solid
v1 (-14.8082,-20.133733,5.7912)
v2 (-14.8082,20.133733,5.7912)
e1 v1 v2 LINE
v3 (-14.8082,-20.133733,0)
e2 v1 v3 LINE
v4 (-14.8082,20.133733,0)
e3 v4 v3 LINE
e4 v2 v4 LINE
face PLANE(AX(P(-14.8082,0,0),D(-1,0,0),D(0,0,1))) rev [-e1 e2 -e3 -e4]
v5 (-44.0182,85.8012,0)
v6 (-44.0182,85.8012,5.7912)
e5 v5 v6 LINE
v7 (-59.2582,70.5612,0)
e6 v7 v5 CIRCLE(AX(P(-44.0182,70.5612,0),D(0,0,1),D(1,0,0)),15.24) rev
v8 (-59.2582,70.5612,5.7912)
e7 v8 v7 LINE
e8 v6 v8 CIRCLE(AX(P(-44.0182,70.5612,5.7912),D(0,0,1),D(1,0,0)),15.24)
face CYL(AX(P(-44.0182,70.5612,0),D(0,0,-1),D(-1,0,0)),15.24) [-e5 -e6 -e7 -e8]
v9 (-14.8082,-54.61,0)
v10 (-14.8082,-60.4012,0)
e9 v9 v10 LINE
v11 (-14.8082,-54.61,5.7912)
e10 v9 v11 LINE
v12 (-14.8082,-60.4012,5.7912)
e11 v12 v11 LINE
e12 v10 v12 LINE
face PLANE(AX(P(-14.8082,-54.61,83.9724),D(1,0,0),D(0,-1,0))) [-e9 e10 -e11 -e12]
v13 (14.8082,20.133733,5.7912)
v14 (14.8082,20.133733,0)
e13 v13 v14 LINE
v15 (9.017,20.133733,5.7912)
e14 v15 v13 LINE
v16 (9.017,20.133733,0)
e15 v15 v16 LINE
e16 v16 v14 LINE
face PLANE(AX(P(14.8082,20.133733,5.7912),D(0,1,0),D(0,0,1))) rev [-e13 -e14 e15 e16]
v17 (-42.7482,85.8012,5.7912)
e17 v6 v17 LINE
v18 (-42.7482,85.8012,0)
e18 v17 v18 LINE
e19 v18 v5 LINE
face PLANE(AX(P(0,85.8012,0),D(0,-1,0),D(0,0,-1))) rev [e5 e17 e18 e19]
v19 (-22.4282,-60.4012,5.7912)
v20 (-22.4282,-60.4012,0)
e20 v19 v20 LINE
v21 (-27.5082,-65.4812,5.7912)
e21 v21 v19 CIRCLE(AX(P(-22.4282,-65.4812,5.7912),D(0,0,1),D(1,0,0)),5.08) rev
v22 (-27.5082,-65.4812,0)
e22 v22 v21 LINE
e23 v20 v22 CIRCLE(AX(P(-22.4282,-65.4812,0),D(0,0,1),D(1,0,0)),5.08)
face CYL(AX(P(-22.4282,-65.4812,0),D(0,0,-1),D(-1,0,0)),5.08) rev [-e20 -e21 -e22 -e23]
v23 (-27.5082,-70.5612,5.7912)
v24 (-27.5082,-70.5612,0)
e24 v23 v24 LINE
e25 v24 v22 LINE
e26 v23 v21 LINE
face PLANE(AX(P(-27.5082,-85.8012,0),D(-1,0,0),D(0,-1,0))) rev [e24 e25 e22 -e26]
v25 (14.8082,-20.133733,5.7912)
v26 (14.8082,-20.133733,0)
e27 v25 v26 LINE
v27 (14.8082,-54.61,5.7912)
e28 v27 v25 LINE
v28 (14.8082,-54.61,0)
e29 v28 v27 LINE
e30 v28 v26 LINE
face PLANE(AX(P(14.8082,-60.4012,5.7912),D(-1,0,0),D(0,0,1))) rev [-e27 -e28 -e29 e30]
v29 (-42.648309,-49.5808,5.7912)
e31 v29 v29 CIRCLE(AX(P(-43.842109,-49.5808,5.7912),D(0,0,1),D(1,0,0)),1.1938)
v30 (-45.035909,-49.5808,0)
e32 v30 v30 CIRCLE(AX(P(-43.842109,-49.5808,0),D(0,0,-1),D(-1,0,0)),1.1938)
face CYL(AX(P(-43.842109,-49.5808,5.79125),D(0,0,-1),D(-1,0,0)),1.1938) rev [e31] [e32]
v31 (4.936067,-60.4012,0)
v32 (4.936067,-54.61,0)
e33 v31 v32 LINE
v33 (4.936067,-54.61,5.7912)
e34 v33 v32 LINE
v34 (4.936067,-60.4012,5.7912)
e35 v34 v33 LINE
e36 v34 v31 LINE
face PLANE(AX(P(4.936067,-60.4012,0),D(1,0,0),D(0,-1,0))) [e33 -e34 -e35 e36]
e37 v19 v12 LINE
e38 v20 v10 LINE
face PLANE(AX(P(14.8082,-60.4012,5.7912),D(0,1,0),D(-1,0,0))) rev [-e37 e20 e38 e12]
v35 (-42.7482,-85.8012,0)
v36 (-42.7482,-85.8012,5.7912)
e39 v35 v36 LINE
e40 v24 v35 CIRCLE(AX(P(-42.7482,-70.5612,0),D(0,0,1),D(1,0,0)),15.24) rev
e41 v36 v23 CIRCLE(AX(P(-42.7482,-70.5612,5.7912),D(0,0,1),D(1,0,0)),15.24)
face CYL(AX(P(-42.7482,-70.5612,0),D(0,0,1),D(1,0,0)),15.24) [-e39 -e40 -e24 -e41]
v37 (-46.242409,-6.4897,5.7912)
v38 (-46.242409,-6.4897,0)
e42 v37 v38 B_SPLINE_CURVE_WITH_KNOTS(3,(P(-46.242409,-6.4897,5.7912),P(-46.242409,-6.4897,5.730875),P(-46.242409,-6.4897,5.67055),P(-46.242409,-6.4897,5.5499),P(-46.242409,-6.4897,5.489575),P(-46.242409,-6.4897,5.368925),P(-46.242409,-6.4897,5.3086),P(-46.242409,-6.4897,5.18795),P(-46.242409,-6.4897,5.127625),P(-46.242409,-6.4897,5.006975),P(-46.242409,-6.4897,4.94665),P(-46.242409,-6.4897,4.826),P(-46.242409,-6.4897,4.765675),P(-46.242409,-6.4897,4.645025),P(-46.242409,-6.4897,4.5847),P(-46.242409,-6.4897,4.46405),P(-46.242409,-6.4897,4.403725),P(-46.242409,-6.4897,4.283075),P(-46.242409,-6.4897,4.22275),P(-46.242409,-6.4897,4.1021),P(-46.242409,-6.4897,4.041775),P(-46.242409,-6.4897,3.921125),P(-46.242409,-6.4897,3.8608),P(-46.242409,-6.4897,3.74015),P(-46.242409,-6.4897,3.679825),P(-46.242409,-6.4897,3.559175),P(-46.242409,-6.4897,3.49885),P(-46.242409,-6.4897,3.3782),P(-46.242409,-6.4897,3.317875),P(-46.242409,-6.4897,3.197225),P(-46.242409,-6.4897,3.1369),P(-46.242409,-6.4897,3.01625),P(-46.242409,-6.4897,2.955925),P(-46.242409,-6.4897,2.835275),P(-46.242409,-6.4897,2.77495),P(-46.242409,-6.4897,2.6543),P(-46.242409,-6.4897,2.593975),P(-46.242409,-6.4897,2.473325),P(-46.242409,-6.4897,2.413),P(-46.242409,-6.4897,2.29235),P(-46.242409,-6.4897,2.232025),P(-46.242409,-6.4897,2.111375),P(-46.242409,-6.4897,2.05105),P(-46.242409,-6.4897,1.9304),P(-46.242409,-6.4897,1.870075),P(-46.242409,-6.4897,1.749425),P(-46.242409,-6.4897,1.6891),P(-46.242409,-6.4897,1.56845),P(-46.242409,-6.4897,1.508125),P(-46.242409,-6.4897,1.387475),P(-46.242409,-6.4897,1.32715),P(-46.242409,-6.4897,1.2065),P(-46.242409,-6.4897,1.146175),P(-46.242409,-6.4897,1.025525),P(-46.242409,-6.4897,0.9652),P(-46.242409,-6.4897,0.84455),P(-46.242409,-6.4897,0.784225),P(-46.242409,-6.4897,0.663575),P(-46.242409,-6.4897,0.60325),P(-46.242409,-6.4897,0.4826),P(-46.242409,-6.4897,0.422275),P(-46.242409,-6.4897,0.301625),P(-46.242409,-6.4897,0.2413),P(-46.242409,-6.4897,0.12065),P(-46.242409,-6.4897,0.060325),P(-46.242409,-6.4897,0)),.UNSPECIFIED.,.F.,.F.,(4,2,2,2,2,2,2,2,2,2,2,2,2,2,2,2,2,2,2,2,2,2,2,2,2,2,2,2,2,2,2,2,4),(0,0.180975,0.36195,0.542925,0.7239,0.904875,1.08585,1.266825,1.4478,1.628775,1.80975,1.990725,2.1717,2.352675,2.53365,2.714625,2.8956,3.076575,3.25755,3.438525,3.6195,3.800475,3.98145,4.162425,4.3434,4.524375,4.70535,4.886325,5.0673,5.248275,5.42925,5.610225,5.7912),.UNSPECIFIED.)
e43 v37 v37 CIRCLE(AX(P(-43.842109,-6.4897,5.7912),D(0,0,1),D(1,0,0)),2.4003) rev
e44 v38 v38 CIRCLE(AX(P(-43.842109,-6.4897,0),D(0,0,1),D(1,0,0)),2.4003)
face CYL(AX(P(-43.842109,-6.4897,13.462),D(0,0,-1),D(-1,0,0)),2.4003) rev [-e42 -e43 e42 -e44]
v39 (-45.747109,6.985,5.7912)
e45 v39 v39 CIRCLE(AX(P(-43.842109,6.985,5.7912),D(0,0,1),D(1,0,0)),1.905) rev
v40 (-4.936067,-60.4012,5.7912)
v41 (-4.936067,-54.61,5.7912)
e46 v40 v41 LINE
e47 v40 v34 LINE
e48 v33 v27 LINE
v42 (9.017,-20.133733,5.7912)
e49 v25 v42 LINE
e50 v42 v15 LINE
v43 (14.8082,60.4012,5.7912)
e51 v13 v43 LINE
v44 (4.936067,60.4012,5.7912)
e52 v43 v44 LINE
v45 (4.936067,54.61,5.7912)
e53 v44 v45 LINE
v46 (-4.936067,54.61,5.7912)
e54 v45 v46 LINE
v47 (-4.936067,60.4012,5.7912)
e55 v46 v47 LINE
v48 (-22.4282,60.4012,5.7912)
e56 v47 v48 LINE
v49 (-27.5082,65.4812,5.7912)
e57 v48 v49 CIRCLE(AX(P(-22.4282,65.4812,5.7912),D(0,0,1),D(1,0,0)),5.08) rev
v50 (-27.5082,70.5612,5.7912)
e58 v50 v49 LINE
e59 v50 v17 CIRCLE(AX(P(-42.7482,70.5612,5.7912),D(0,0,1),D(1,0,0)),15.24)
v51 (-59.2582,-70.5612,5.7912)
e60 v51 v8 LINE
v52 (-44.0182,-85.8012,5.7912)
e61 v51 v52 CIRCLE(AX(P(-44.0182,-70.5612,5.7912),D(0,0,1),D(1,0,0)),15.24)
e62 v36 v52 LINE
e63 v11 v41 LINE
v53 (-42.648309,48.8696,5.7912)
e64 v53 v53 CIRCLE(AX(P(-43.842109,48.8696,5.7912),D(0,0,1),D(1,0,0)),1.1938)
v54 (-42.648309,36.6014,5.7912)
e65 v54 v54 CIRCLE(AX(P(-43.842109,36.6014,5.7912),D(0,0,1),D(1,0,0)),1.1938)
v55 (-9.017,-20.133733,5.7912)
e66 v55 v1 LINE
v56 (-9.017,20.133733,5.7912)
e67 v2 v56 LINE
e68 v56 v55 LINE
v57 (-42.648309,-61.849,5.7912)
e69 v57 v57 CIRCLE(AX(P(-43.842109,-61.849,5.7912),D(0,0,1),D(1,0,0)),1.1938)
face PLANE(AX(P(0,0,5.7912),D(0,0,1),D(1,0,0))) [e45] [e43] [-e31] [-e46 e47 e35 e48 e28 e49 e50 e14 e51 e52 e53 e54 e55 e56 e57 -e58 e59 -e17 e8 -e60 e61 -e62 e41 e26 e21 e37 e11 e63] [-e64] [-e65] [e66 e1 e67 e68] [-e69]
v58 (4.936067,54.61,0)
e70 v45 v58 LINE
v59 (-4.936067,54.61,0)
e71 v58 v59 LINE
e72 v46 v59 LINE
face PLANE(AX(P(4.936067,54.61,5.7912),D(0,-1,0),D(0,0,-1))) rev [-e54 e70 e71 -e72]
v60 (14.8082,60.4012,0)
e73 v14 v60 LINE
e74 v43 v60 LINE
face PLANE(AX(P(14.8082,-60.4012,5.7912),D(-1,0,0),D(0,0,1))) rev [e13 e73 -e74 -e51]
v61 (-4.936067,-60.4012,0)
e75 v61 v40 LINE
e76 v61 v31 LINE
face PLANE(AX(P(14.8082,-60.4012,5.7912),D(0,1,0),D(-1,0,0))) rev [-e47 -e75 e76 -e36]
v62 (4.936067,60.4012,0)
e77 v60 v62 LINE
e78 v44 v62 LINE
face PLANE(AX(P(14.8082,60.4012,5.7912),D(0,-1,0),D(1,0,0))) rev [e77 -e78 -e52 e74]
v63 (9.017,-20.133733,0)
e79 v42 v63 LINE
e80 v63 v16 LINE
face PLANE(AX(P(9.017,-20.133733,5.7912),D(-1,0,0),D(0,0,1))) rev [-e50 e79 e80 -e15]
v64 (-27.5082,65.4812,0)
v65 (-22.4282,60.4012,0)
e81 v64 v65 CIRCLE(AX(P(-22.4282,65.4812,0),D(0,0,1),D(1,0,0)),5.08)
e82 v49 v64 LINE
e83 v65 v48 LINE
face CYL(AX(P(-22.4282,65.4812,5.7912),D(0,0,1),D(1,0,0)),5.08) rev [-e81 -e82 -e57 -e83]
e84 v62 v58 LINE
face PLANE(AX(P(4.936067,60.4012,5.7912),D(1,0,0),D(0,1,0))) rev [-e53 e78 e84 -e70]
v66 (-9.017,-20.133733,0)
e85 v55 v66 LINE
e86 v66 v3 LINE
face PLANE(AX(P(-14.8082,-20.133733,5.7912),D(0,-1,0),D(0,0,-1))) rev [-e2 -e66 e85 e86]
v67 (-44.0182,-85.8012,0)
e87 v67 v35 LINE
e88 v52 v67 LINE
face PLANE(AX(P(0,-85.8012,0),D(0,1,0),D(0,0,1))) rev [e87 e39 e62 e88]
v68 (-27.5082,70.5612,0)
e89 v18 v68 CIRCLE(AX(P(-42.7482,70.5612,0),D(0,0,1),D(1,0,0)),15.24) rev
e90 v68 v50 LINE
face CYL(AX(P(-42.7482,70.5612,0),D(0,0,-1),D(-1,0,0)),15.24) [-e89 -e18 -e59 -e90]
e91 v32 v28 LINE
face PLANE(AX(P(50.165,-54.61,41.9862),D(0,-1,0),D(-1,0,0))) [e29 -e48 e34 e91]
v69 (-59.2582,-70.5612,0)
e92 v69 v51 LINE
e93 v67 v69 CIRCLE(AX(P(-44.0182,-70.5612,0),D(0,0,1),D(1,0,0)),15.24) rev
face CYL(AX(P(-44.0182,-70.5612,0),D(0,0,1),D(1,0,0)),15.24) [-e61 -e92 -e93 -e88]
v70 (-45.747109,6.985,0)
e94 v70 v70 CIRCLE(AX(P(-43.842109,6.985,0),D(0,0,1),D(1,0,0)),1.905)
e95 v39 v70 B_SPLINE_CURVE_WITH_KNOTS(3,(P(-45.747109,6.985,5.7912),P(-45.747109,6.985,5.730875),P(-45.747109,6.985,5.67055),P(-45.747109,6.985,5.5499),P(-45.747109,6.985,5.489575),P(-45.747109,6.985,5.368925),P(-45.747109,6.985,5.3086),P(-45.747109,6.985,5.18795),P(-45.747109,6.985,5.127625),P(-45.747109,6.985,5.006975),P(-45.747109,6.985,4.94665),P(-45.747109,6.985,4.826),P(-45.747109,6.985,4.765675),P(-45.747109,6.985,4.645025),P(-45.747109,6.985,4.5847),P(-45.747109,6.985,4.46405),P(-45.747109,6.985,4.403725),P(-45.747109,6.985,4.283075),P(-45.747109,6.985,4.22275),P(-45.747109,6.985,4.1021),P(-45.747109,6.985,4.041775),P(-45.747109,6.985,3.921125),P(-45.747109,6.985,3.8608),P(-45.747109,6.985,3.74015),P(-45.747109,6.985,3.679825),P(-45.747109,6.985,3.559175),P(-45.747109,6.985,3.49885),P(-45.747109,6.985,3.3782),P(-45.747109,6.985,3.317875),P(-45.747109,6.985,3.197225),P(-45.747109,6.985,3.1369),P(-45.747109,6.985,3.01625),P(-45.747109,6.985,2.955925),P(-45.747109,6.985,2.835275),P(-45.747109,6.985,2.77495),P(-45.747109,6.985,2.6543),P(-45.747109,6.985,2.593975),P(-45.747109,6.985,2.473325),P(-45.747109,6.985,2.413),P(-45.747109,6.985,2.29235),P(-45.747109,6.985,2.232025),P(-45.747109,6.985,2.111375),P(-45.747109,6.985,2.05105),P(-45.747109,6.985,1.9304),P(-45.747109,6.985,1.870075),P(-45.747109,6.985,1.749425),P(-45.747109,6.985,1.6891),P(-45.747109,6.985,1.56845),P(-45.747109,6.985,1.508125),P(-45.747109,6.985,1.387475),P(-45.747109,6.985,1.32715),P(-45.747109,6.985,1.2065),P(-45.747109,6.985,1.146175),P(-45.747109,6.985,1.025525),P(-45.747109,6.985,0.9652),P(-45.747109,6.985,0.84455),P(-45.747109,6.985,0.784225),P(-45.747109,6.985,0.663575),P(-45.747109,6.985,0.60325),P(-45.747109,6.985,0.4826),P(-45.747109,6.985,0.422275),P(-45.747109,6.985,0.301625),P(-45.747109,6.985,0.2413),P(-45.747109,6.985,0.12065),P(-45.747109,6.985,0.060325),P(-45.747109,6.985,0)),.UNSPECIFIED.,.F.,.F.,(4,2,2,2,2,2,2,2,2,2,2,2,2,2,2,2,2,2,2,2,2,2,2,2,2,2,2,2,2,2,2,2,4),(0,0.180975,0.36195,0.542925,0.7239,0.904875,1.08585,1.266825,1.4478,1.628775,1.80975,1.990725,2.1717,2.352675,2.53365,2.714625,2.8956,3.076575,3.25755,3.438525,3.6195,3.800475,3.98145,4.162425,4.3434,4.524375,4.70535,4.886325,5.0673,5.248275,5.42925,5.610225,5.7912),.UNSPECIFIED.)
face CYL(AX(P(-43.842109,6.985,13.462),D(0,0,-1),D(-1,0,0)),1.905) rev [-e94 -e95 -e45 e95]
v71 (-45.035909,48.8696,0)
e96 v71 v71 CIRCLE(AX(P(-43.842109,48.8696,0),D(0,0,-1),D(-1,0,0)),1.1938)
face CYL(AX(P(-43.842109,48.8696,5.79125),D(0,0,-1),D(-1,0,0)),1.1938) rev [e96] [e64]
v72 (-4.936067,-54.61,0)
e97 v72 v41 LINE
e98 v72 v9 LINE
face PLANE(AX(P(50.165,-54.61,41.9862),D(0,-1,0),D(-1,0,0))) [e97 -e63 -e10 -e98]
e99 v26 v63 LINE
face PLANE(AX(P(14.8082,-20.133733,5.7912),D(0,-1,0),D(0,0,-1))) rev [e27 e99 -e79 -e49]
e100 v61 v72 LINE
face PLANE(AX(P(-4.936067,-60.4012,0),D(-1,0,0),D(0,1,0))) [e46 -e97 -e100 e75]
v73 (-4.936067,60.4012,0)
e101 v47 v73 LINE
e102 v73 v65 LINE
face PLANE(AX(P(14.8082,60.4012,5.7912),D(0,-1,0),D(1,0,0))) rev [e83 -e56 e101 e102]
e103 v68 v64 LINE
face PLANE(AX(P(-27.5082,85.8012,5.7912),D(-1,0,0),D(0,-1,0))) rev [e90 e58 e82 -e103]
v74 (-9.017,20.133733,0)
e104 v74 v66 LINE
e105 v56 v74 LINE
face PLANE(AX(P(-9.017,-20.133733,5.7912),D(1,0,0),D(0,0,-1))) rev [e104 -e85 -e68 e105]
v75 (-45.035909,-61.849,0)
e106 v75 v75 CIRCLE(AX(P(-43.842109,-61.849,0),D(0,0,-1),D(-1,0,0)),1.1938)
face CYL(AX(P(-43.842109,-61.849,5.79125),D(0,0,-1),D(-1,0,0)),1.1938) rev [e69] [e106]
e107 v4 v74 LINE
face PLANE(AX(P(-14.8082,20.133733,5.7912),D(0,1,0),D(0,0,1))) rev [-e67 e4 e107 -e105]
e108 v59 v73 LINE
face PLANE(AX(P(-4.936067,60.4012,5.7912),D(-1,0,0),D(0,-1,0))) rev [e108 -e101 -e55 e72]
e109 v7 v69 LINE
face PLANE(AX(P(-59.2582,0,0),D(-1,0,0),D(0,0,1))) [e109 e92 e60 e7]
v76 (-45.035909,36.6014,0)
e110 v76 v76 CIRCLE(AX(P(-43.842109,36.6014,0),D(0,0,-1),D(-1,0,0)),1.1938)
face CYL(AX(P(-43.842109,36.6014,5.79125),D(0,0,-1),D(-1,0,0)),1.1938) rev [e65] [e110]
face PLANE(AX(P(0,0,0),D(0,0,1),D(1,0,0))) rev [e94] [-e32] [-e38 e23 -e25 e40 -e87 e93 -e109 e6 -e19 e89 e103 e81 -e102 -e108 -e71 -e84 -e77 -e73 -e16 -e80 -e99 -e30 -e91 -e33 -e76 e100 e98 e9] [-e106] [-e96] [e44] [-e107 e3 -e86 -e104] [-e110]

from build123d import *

# Parameters (mm, degrees)
SKETCH1_W           = 29.6164
SKETCH1_H           = 120.8024
BOSS_EXTRUDE1_DEPTH = 5.7912
SKETCH3_W           = 5.7912
SKETCH3_H           = 40.267466666
CUT_EXTRUDE2_DEPTH  = 63.458992516
SKETCH6_W           = 9.872133334
SKETCH6_H           = 5.7912
CUT_EXTRUDE5_DEPTH  = 63.458992516
SKETCH9_W           = 5.7912
SKETCH9_H           = 120.8024
BOSS_EXTRUDE3_DEPTH = 44.45
SKETCH13_W          = 31.75
SKETCH13_H          = 5.7912
BOSS_EXTRUDE4_DEPTH = 25.4
SKETCH14_W          = 31.75
SKETCH14_H          = 5.7912
BOSS_EXTRUDE5_DEPTH = 25.4
SKETCH16_R          = 2.4003
SKETCH16_R_2        = 1.905
CUT_EXTRUDE8_DEPTH  = 13.462
SKETCH18_R          = 1.1938
CUT_EXTRUDE9_DEPTH  = 105.436191936
FILLET2_R           = 15.24
FILLET3_R           = 5.08
CAVITY1_START       = -14.8082
CAVITY1_OUTLINE_W   = 5.7912
CAVITY1_OUTLINE_H   = 5.7912
CAVITY1_DEPTH       = 9.872133333
CAVITY1_START_2     = 4.936066667
CAVITY1_2_OUTLINE_W = 5.7912
CAVITY1_2_OUTLINE_H = 5.7912
CAVITY1_2_DEPTH     = 9.872133333


# Read off the part's stored shape, not the designer's step: Cavity1
with BuildPart() as part:
    # Sketch1 → Boss-Extrude1 (new body)
    with BuildSketch(Plane.XY):
        Rectangle(SKETCH1_W, SKETCH1_H)
    extrude(amount=BOSS_EXTRUDE1_DEPTH)

    # Sketch3 → Cut-Extrude2 (cut, through all)
    with BuildSketch(Plane(origin=(0, 0, 0), x_dir=(-1, 0, 0), z_dir=(0, 0, -1))):
        with Locations((-11.9126, 0)):
            Rectangle(SKETCH3_W, SKETCH3_H)
        with Locations((11.9126, 0)):
            Rectangle(SKETCH3_W, SKETCH3_H)
    extrude(amount=-CUT_EXTRUDE2_DEPTH, mode=Mode.SUBTRACT)

    # Sketch6 → Cut-Extrude5 (cut, through all)
    with BuildSketch(Plane(origin=(0, 0, 0), x_dir=(-1, 0, 0), z_dir=(0, 0, -1))):
        with Locations((0, 57.5056)):
            Rectangle(SKETCH6_W, SKETCH6_H)
    extrude(amount=-CUT_EXTRUDE5_DEPTH, mode=Mode.SUBTRACT)

    # Sketch9 → Boss-Extrude3 (add)
    with BuildSketch(Plane.ZY.offset(14.8082)):
        with Locations((2.8956, 0)):
            Rectangle(SKETCH9_W, SKETCH9_H)
    extrude(amount=BOSS_EXTRUDE3_DEPTH)

    # Sketch13 → Boss-Extrude4 (add)
    with BuildSketch(Plane.XZ.offset(60.4012)):
        with Locations((-43.3832, 2.8956)):
            Rectangle(SKETCH13_W, SKETCH13_H)
    extrude(amount=BOSS_EXTRUDE4_DEPTH)

    # Sketch14 → Boss-Extrude5 (add)
    with BuildSketch(Plane(origin=(0, 60.4012, 0), x_dir=(1, 0, 0), z_dir=(0, 1, 0))):
        with Locations((-43.3832, -2.8956)):
            Rectangle(SKETCH14_W, SKETCH14_H)
    extrude(amount=BOSS_EXTRUDE5_DEPTH)

    # Sketch16 → Cut-Extrude8 (cut)
    with BuildSketch(Plane.XY):
        with Locations(Location((-43.842108599, -6.4897, 0), (0, 0, 180))):
            Circle(SKETCH16_R)
        with Locations(Location((-43.842108599, 6.985, 0), (0, 0, 180))):
            Circle(SKETCH16_R_2)
    extrude(amount=CUT_EXTRUDE8_DEPTH, mode=Mode.SUBTRACT)

    # Sketch18 → Cut-Extrude9 (cut, through all)
    with BuildSketch(Plane(origin=(0, 0, 0), x_dir=(-1, 0, 0), z_dir=(0, 0, -1))):
        with Locations((43.842108599, 48.8696)):
            Circle(SKETCH18_R)
        with Locations((43.842108599, 36.6014)):
            Circle(SKETCH18_R)
        with Locations((43.842108599, -49.5808)):
            Circle(SKETCH18_R)
        with Locations((43.842108599, -61.849)):
            Circle(SKETCH18_R)
    extrude(amount=-CUT_EXTRUDE9_DEPTH, mode=Mode.SUBTRACT)

    # Fillet2
    fillet2_edges = [part.edges().sort_by_distance(p)[0] for p in [
        (-27.5082, 85.8012, 2.8956),
        (-27.5082, -85.8012, 2.8956),
        (-59.2582, 85.8012, 2.8956),
        (-59.2582, -85.8012, 2.8956),
    ]]
    fillet(fillet2_edges, radius=FILLET2_R)

    # Fillet3
    fillet3_edges = [part.edges().sort_by_distance(p)[0] for p in [
        (-27.5082, -60.4012, 2.8956),
        (-27.5082, 60.4012, 2.8956),
    ]]
    fillet(fillet3_edges, radius=FILLET3_R)

    # Cavity1 outline → Cavity1 (cut)
    with BuildSketch(Plane.YZ.offset(CAVITY1_START)):
        with Locations((-57.5056, 2.8956)):
            Rectangle(CAVITY1_OUTLINE_W, CAVITY1_OUTLINE_H)
    extrude(amount=CAVITY1_DEPTH, mode=Mode.SUBTRACT)

    # Cavity1 2 outline → Cavity1 2 (cut)
    with BuildSketch(Plane.YZ.offset(CAVITY1_START_2)):
        with Locations((-57.5056, 2.8956)):
            Rectangle(CAVITY1_2_OUTLINE_W, CAVITY1_2_OUTLINE_H)
    extrude(amount=CAVITY1_2_DEPTH, mode=Mode.SUBTRACT)


solid = part.part
